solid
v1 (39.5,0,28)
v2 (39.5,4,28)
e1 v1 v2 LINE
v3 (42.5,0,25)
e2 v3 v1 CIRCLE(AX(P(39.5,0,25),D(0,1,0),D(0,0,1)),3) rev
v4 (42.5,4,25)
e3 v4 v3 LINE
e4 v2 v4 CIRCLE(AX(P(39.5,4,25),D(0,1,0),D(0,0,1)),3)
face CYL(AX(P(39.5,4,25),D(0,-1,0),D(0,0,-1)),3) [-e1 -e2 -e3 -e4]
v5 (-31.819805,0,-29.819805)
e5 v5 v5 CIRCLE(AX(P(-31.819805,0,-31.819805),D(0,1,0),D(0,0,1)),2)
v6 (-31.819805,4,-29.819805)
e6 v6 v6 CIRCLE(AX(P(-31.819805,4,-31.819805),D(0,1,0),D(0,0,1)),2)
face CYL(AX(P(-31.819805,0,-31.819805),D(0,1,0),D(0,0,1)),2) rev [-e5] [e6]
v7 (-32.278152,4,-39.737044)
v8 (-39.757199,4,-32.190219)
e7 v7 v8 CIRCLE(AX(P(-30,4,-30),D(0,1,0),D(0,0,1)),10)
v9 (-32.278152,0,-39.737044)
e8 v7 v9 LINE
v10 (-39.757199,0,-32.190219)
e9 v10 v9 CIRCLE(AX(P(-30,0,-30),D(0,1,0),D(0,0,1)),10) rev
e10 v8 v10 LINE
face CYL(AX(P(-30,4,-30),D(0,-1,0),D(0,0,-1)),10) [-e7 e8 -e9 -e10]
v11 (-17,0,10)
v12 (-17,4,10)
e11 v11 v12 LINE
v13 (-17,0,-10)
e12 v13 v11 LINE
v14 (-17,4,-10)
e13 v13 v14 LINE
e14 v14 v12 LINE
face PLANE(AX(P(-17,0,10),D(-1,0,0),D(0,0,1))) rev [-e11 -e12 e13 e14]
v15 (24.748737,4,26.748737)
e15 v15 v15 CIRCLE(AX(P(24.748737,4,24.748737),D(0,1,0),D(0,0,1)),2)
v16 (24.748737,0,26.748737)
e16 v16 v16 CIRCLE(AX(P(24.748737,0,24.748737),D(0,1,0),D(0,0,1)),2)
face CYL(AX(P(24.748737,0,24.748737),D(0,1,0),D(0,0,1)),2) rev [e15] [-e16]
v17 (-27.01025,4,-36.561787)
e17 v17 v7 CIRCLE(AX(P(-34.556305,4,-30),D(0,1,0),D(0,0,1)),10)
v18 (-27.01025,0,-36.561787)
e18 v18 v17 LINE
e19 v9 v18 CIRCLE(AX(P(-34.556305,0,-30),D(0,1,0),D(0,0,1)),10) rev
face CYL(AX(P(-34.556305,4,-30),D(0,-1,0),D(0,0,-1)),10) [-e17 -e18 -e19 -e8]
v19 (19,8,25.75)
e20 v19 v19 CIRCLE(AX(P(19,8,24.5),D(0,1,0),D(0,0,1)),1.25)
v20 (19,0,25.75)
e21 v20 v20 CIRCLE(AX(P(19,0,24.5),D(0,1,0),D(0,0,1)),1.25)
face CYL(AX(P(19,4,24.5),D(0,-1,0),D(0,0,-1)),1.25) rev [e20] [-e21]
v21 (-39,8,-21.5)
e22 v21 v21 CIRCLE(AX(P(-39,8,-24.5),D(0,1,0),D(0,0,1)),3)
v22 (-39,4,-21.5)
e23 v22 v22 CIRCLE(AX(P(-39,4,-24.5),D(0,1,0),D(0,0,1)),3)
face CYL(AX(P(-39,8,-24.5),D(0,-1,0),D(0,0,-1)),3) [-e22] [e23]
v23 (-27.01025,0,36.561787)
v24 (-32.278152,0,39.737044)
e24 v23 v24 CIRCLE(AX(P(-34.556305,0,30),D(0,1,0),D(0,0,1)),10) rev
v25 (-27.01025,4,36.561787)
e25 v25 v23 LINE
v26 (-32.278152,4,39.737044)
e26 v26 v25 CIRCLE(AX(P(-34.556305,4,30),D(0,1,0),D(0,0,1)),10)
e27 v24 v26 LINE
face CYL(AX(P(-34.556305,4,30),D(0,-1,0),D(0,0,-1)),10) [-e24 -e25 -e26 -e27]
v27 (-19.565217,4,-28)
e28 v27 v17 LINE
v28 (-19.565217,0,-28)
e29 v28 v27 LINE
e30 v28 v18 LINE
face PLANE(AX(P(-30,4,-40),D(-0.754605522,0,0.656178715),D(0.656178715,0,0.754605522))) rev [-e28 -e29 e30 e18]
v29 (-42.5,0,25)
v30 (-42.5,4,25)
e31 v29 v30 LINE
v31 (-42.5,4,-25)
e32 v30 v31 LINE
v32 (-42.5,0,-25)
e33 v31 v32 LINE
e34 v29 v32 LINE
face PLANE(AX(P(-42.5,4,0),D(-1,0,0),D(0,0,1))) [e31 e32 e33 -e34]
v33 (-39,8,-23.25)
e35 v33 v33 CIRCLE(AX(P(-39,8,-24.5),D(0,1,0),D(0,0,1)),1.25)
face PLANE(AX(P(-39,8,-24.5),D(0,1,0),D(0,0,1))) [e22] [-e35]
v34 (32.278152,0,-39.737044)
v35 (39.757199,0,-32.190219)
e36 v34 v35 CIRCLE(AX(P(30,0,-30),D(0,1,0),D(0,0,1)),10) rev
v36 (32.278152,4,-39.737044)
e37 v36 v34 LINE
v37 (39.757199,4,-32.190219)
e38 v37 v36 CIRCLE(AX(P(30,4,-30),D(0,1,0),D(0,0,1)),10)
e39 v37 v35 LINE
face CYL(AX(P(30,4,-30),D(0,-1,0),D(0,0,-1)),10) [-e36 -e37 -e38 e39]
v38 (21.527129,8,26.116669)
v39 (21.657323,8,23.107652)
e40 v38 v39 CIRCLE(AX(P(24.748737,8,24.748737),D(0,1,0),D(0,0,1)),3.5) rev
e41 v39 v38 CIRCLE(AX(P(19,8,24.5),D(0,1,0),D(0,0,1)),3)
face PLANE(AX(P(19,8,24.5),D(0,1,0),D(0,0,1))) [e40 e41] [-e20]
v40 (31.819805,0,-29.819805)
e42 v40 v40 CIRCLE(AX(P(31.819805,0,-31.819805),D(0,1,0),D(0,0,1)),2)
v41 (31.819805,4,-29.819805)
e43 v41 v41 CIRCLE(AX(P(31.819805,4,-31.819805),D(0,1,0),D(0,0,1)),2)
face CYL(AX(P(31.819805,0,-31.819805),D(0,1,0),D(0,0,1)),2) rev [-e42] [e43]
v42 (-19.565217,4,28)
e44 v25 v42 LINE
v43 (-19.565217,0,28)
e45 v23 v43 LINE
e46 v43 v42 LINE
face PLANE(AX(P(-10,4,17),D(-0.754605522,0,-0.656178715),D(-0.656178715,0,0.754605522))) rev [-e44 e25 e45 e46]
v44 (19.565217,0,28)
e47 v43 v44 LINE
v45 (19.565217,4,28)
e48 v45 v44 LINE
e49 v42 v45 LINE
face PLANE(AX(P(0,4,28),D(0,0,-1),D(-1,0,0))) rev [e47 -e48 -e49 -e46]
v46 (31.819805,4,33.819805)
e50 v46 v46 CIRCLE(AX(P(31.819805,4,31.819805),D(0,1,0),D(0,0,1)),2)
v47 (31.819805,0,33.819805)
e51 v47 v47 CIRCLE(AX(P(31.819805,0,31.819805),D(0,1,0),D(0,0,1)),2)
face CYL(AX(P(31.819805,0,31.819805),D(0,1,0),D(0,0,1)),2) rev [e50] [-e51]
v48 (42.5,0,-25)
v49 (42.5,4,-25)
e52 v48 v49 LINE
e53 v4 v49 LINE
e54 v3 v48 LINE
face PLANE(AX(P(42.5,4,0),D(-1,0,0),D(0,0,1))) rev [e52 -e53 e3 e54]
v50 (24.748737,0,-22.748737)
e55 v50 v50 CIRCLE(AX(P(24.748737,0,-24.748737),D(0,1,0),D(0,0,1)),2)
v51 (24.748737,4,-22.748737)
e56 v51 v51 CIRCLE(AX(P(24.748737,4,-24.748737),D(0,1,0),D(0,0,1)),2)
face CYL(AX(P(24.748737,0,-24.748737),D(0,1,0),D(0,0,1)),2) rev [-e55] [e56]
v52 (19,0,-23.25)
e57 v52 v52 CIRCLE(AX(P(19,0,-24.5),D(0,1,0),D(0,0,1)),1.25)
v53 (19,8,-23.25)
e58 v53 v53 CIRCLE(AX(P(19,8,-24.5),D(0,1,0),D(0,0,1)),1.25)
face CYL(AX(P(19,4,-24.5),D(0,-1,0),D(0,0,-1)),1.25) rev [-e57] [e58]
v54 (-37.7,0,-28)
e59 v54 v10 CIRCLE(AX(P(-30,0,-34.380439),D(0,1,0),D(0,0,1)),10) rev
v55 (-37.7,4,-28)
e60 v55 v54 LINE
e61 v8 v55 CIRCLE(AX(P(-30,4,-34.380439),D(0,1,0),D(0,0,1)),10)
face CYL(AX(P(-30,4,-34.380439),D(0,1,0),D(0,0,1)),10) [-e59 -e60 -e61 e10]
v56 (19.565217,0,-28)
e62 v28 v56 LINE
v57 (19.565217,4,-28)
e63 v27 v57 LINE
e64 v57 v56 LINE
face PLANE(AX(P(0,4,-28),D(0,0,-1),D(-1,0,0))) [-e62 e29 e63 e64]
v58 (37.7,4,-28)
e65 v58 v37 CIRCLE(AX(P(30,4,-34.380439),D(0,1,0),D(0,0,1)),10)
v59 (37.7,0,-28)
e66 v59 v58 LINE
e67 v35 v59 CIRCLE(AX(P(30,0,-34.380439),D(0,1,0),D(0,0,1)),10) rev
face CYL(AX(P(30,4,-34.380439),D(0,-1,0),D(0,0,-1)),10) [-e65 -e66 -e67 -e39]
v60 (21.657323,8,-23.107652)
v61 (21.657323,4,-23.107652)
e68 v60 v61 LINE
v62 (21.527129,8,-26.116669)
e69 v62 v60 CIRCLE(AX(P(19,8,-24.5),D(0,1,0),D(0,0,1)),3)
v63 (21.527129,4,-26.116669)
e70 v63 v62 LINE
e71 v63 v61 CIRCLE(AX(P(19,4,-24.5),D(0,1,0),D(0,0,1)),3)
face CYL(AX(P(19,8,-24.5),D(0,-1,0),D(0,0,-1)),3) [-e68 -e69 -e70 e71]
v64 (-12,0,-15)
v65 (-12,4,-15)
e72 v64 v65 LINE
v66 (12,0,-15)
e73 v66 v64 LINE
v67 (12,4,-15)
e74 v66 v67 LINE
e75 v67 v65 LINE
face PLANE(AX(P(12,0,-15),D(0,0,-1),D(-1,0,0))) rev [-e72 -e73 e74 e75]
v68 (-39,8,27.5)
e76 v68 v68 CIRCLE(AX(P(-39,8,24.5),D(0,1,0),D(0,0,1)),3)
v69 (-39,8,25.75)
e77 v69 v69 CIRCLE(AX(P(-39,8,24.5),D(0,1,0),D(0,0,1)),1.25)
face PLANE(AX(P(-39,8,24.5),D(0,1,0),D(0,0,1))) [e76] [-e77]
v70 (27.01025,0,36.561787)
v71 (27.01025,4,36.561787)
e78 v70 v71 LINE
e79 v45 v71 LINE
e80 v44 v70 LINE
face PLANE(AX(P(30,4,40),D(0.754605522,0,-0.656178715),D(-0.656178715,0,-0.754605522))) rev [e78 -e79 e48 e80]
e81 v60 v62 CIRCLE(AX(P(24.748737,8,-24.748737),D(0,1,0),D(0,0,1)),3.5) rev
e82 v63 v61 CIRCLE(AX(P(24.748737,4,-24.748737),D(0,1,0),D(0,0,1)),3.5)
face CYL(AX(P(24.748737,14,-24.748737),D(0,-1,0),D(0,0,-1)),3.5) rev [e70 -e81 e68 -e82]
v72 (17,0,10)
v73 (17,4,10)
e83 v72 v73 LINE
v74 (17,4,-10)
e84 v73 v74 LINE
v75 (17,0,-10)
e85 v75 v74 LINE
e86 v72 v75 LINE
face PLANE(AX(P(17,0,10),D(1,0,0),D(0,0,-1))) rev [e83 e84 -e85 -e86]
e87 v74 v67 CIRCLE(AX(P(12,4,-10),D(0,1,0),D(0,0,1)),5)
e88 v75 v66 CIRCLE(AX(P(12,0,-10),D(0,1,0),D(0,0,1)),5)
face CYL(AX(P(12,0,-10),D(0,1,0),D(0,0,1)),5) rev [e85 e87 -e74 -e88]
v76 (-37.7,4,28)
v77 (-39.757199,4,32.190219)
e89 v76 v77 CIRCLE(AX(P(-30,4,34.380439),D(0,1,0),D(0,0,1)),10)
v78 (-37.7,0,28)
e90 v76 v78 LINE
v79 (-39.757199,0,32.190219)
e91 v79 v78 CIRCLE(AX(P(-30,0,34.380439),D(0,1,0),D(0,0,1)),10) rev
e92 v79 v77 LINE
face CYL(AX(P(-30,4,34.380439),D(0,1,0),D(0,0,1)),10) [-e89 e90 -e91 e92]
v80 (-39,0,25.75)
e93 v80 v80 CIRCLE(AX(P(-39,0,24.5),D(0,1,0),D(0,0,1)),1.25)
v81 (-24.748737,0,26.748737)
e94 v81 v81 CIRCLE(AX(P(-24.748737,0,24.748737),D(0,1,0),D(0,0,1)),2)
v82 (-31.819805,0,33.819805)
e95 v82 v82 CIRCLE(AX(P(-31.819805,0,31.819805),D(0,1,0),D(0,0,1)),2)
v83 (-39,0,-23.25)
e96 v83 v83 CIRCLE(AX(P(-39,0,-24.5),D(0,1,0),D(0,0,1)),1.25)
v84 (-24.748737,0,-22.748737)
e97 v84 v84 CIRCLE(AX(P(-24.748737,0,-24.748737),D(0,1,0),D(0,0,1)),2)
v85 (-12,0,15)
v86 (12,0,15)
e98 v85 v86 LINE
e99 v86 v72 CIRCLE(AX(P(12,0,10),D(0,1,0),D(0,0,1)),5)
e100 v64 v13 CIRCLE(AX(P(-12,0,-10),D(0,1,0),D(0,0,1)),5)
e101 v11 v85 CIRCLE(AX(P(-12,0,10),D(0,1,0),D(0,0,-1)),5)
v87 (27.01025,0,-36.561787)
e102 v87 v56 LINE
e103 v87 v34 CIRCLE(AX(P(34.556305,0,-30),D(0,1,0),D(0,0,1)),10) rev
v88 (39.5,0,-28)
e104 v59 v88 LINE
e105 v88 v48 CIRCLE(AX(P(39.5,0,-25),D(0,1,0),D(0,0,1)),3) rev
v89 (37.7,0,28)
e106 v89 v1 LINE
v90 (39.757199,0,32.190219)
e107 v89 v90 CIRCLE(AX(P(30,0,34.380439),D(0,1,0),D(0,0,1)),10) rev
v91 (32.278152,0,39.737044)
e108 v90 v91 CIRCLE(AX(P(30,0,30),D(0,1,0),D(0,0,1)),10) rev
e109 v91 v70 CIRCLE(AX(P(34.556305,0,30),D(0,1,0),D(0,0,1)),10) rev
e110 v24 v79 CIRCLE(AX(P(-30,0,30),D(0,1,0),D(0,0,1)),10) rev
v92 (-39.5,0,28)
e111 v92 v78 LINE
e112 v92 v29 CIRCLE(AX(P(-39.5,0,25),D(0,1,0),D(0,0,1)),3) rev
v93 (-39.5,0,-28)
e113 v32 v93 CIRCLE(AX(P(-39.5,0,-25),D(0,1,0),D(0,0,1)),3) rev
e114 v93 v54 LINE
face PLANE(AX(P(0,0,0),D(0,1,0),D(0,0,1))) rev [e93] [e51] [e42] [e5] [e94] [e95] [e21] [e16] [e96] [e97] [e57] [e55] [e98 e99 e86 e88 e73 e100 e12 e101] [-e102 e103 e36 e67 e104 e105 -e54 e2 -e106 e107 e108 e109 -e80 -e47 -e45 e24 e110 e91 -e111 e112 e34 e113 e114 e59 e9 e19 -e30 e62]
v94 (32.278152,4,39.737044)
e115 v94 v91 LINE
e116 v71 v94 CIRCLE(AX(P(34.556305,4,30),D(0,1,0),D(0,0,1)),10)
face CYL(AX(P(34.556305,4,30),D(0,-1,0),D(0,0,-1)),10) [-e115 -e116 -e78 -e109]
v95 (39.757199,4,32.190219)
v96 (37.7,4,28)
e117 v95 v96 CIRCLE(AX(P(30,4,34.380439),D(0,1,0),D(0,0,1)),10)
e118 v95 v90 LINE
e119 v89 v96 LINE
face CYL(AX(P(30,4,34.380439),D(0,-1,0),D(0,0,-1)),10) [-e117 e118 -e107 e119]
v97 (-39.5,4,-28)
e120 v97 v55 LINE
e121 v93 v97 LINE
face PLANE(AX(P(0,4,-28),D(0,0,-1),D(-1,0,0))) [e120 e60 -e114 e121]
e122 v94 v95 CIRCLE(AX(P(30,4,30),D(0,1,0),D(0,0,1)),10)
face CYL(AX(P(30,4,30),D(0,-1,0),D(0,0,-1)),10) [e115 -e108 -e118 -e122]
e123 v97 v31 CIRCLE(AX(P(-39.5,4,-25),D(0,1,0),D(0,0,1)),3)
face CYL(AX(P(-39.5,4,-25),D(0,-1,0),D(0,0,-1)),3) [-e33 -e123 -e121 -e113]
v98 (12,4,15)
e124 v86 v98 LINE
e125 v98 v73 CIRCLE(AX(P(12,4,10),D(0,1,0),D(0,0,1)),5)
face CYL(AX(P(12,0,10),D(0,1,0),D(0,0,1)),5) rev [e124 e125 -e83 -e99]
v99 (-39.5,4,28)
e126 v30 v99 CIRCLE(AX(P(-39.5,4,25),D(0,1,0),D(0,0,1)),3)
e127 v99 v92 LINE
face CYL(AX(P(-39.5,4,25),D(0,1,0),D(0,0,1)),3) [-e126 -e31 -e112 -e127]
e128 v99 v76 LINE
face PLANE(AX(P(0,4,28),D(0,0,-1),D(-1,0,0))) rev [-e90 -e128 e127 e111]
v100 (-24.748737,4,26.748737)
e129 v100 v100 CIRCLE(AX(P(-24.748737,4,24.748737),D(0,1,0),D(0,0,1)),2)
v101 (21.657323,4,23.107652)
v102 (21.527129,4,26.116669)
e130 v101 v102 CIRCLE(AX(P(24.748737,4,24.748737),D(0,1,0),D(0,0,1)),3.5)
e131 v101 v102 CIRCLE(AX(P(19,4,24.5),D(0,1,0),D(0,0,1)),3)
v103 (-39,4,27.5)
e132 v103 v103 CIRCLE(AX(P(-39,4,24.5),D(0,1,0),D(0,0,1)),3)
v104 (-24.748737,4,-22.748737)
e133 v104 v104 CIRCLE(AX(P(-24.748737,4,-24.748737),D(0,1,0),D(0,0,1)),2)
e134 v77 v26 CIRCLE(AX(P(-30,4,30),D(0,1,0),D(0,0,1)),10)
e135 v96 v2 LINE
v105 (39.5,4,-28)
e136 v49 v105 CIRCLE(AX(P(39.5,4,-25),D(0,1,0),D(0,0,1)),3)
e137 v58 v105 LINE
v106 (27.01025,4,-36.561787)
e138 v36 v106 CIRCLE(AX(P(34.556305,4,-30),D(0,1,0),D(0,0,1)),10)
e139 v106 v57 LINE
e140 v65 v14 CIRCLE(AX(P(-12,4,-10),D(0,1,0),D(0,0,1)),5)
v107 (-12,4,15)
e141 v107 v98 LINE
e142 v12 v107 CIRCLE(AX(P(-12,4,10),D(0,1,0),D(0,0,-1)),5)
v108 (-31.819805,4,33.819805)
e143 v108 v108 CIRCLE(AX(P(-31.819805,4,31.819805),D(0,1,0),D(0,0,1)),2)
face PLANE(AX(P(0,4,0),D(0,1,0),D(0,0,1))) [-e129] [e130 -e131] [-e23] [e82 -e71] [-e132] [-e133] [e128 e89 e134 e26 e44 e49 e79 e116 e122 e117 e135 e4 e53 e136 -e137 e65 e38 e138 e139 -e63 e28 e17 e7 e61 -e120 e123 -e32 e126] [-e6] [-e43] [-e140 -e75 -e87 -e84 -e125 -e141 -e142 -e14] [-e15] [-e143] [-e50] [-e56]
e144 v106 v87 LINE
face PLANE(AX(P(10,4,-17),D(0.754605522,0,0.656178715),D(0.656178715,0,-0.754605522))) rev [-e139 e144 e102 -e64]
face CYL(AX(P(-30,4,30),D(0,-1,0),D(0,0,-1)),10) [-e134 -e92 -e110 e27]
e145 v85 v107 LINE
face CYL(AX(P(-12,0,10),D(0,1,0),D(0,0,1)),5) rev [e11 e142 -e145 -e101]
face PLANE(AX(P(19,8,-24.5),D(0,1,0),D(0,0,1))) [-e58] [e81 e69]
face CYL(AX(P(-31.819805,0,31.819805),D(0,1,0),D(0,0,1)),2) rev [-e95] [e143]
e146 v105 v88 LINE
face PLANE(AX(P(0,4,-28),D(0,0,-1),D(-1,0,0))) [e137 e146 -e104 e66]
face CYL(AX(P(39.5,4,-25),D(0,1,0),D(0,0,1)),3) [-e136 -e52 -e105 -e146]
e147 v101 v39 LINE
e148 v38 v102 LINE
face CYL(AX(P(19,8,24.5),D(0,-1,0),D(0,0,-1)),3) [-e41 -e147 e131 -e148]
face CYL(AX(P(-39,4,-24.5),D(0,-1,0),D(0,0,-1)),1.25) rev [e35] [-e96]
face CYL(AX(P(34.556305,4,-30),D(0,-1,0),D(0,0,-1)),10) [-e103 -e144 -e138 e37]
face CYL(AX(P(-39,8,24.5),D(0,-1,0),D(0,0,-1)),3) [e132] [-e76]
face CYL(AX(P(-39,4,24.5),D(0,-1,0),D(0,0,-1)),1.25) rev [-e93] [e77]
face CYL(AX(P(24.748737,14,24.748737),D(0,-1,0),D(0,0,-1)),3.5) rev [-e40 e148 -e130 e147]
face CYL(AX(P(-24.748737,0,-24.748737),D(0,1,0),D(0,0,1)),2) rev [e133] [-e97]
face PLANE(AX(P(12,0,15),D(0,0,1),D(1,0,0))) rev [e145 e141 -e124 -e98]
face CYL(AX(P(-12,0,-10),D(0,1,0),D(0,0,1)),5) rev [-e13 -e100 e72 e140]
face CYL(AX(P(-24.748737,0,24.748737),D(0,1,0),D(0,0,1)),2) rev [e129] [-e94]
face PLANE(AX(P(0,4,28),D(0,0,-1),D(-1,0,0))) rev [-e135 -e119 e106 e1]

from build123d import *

# Parameters (mm, degrees)
SKETCH1_W           = 85
SKETCH1_H           = 56
SKETCH1_R           = 1.25
BOSS_EXTRUDE1_DEPTH = 4
SKETCH2_R           = 3
SKETCH2_R_2         = 1.25
BOSS_EXTRUDE2_DEPTH = 4
FILLET1_R           = 3
BOSS_EXTRUDE4_DEPTH = 4
SKETCH3_R           = 2
CUT_EXTRUDE1_DEPTH  = 59.5
FILLET2_R           = 10
CUT_EXTRUDE2_START  = -10
SKETCH6_R           = 1.25
CUT_EXTRUDE2_DEPTH  = 10
SKETCH7_R           = 3.5
CUT_EXTRUDE3_DEPTH  = 10


with BuildPart() as part:
    # Sketch1 → Boss-Extrude1 (new body)
    with BuildSketch(Plane(origin=(0, 0, 0), x_dir=(1, 0, 0), z_dir=(0, 1, 0))):
        Rectangle(SKETCH1_W, SKETCH1_H)
        with Locations(Location((-39, 24.5, 0), (0, 0, 270))):
            Circle(SKETCH1_R, mode=Mode.SUBTRACT)
        with Locations(Location((-39, -24.5, 0), (0, 0, 270))):
            Circle(SKETCH1_R, mode=Mode.SUBTRACT)
        with Locations(Location((19, 24.5, 0), (0, 0, 270))):
            Circle(SKETCH1_R, mode=Mode.SUBTRACT)
        with Locations(Location((19, -24.5, 0), (0, 0, 270))):
            Circle(SKETCH1_R, mode=Mode.SUBTRACT)
        with BuildLine():
            Line((-12, -15), (12, -15))
            ThreePointArc((12, -15), (15.535533906, -13.535533906), (17, -10))
            Line((17, -10), (17, 10))
            ThreePointArc((17, 10), (15.535533906, 13.535533906), (12, 15))
            Line((12, 15), (-12, 15))
            ThreePointArc((-12, 15), (-15.535533906, 13.535533906), (-17, 10))
            Line((-17, 10), (-17, -10))
            ThreePointArc((-17, -10), (-15.535533906, -13.535533906), (-12, -15))
        make_face(mode=Mode.SUBTRACT)
    extrude(amount=BOSS_EXTRUDE1_DEPTH)

    # Sketch2 → Boss-Extrude2 (add)
    # profile 1 of 4: a face of its own
    with BuildSketch(Plane(origin=(0, 4, 0), x_dir=(1, 0, 0), z_dir=(0, 1, 0))):
        with Locations(Location((-39, 24.5, 0), (0, 0, 270))):
            Circle(SKETCH2_R)
        with Locations(Location((-39, 24.5, 0), (0, 0, 270))):
            Circle(SKETCH2_R_2, mode=Mode.SUBTRACT)
    # profile 2 of 4: a face of its own
    with BuildSketch(Plane(origin=(0, 4, 0), x_dir=(1, 0, 0), z_dir=(0, 1, 0))):
        with Locations(Location((19, 24.5, 0), (0, 0, 270))):
            Circle(SKETCH2_R)
        with Locations(Location((19, 24.5, 0), (0, 0, 270))):
            Circle(SKETCH2_R_2, mode=Mode.SUBTRACT)
    # profile 3 of 4: a face of its own
    with BuildSketch(Plane(origin=(0, 4, 0), x_dir=(1, 0, 0), z_dir=(0, 1, 0))):
        with Locations(Location((19, -24.5, 0), (0, 0, 270))):
            Circle(SKETCH2_R)
        with Locations(Location((19, -24.5, 0), (0, 0, 270))):
            Circle(SKETCH2_R_2, mode=Mode.SUBTRACT)
    # profile 4 of 4: a face of its own
    with BuildSketch(Plane(origin=(0, 4, 0), x_dir=(1, 0, 0), z_dir=(0, 1, 0))):
        with Locations(Location((-39, -24.5, 0), (0, 0, 270))):
            Circle(SKETCH2_R)
        with Locations(Location((-39, -24.5, 0), (0, 0, 270))):
            Circle(SKETCH2_R_2, mode=Mode.SUBTRACT)
    extrude(amount=BOSS_EXTRUDE2_DEPTH)

    # Fillet1
    fillet1_edges = [part.edges().sort_by_distance(p)[0] for p in [
        (-42.5, 2, 28),
        (-42.5, 2, -28),
        (42.5, 2, -28),
        (42.5, 2, 28),
    ]]
    fillet(fillet1_edges, radius=FILLET1_R)

    # Sketch5 → Boss-Extrude4 (add)
    with BuildSketch(Plane(origin=(0, 0, 0), x_dir=(1, 0, 0), z_dir=(0, 1, 0))):
        Polygon((-40, -30), (-17, -10), (-17, 10), (-40, 30), (-40, 40), (-30, 40), (-10, 17), (10, 17), (30, 40), (40, 40), (40, 30), (17, 10), (17, -10), (40, -30), (40, -40), (30, -40), (10, -17), (-10, -17), (-30, -40), (-40, -40), align=None)
    extrude(amount=BOSS_EXTRUDE4_DEPTH)

    # Sketch3 → Cut-Extrude1 (cut, through all)
    with BuildSketch(Plane(origin=(0, 4, 0), x_dir=(1, 0, 0), z_dir=(0, 1, 0))):
        with Locations(Location((-31.819805153, 31.819805153, 0), (0, 0, 270))):
            Circle(SKETCH3_R)
        with Locations(Location((-24.748737342, 24.748737342, 0), (0, 0, 270))):
            Circle(SKETCH3_R)
        with Locations(Location((31.819805153, 31.819805153, 0), (0, 0, 270))):
            Circle(SKETCH3_R)
        with Locations(Location((24.748737342, 24.748737342, 0), (0, 0, 270))):
            Circle(SKETCH3_R)
        with Locations(Location((24.748737342, -24.748737342, 0), (0, 0, 270))):
            Circle(SKETCH3_R)
        with Locations(Location((31.819805153, -31.819805153, 0), (0, 0, 270))):
            Circle(SKETCH3_R)
        with Locations(Location((-31.819805153, -31.819805153, 0), (0, 0, 270))):
            Circle(SKETCH3_R)
        with Locations(Location((-24.748737342, -24.748737342, 0), (0, 0, 270))):
            Circle(SKETCH3_R)
        with BuildLine():
            Line((12, -15), (-12, -15))
            ThreePointArc((-12, -15), (-15.535533906, -13.535533906), (-17, -10))
            Line((-17, -10), (-17, 10))
            ThreePointArc((-17, 10), (-15.535533906, 13.535533906), (-12, 15))
            Line((-12, 15), (12, 15))
            ThreePointArc((12, 15), (15.535533906, 13.535533906), (17, 10))
            Line((17, 10), (17, -10))
            ThreePointArc((17, -10), (15.535533906, -13.535533906), (12, -15))
        make_face()
    extrude(amount=-CUT_EXTRUDE1_DEPTH, mode=Mode.SUBTRACT)

    # Fillet2
    # the kernel refuses this fillet: 10 mm, written as the material it takes off along each edge
    with BuildSketch(Plane(origin=(-40, -10.951097141, -30), x_dir=(0.7546055221635131, 0, 0.6561787149247771), z_dir=(0, 1, 0))) as fillet2_piece_1_section:
        with BuildLine():
            CenterArc((4.671704482, 9.8672905), FILLET2_R, 221.009086902, 39.646111147)
            Line((-2.87435074, 3.305503351), (-3.025271844, 3.174267608))
            Line((-3.025271844, 3.174267608), (-0.150921104, -0.131235743))
            Line((-0.150921104, -0.131235743), (0, -0.2))
            ThreePointArc((0, -0.2), (1.523975065, -0.2), (3.015475044, -0.19734581))
            Line((3.015475044, -0.19734581), (3.047950131, 0))
        make_face()
    fillet2_piece_1 = extrude(amount=25.902194282, mode=Mode.PRIVATE)
    fillet2_piece_1 = split(fillet2_piece_1, bisect_by=Plane(origin=(-39.506364614, 2, -28), z_dir=(0, 0, -1)), keep=Keep.TOP, mode=Mode.PRIVATE)
    add(fillet2_piece_1, mode=Mode.SUBTRACT)
    with BuildSketch(Plane(origin=(-40, -25, -40), x_dir=(0, 0, 1), z_dir=(0, 1, 0)), Plane(origin=(40, -25, -40), x_dir=(-1, 0, 0), z_dir=(0, 1, 0))) as fillet2_piece_2:
        with BuildLine():
            CenterArc((FILLET2_R, FILLET2_R), FILLET2_R, 180, 90)
            Line((0, FILLET2_R), (-FILLET2_R * 0.02, FILLET2_R))
            Line((-FILLET2_R * 0.02, FILLET2_R), (-FILLET2_R * 0.02, -FILLET2_R * 0.02))
            Line((-FILLET2_R * 0.02, -FILLET2_R * 0.02), (FILLET2_R, -FILLET2_R * 0.02))
            Line((FILLET2_R, -FILLET2_R * 0.02), (FILLET2_R, 0))
        make_face()
    extrude(amount=54, mode=Mode.SUBTRACT)
    with BuildSketch(Plane(origin=(-30, -11.390762292, -40), x_dir=(-1, 0, 0), z_dir=(0, 1, 0)), Plane(origin=(30, -11.390762292, -40), x_dir=(-0.6561787149247741, 0, 0.7546055221635154), z_dir=(0, 1, 0))) as fillet2_piece_3:
        with BuildLine():
            CenterArc((FILLET2_R * 0.455630491663, FILLET2_R), FILLET2_R, 221.009086902, 48.990913098)
            Line((-FILLET2_R * 0.2989750305, FILLET2_R * 0.343821285075), (-FILLET2_R * 0.314067140943, FILLET2_R * 0.330697710777))
            Line((-FILLET2_R * 0.314067140943, FILLET2_R * 0.330697710777), (-FILLET2_R * 0.00911260983327, -FILLET2_R * 0.02))
            Line((-FILLET2_R * 0.00911260983327, -FILLET2_R * 0.02), (FILLET2_R * 0.455630491663, -FILLET2_R * 0.02))
            Line((FILLET2_R * 0.455630491663, -FILLET2_R * 0.02), (FILLET2_R * 0.455630491663, 0))
        make_face()
    extrude(amount=26.781524583, mode=Mode.SUBTRACT)
    with BuildSketch(Plane(origin=(40, -10.951097141, -30), x_dir=(0, 0, -1), z_dir=(0, 1, 0))) as fillet2_piece_4_section:
        with BuildLine():
            CenterArc((4.380438856, 10), FILLET2_R, 230.353888853, 39.646111147)
            Line((-2, 2.3), (-2.127608777, 2.146))
            ThreePointArc((-2.127608777, 2.146), (-1.150921104, 1.018764257), (-0.150921104, -0.131235743))
            Line((-0.150921104, -0.131235743), (0, -0.2))
            Line((0, -0.2), (4.380438856, -0.2))
            Line((4.380438856, -0.2), (4.380438856, 0))
        make_face()
    fillet2_piece_4 = extrude(amount=25.902194282, mode=Mode.PRIVATE)
    fillet2_piece_4 = split(fillet2_piece_4, bisect_by=Plane(origin=(39.506364614, 2, -28), z_dir=(0, 0, -1)), keep=Keep.TOP, mode=Mode.PRIVATE)
    add(fillet2_piece_4, mode=Mode.SUBTRACT)
    with BuildSketch(Plane(origin=(40, -10.951097141, 30), x_dir=(0, 0, 1), z_dir=(0, 1, 0))) as fillet2_piece_5_section:
        with BuildLine():
            CenterArc((4.380438856, -10), FILLET2_R, 90, 39.646111147)
            Line((-2, -2.3), (-2.127608777, -2.146))
            ThreePointArc((-2.127608777, -2.146), (-1.150921104, -1.018764257), (-0.150921104, 0.131235743))
            Line((-0.150921104, 0.131235743), (0, 0.2))
            Line((0, 0.2), (4.380438856, 0.2))
            Line((4.380438856, 0.2), (4.380438856, 0))
        make_face()
    fillet2_piece_5 = extrude(amount=25.902194282, mode=Mode.PRIVATE)
    fillet2_piece_5 = split(fillet2_piece_5, bisect_by=Plane(origin=(39.506364614, 2, 28), z_dir=(0, 0, 1)), keep=Keep.TOP, mode=Mode.PRIVATE)
    add(fillet2_piece_5, mode=Mode.SUBTRACT)
    with BuildSketch(Plane(origin=(40, -25, 40), x_dir=(-1, 0, 0), z_dir=(0, 1, 0)), Plane(origin=(-40, -25, 40), x_dir=(0, 0, -1), z_dir=(0, 1, 0))) as fillet2_piece_6:
        with BuildLine():
            CenterArc((FILLET2_R, -FILLET2_R), FILLET2_R, 90, 90)
            Line((0, -FILLET2_R), (-FILLET2_R * 0.02, -FILLET2_R))
            Line((-FILLET2_R * 0.02, -FILLET2_R), (-FILLET2_R * 0.02, FILLET2_R * 0.02))
            Line((-FILLET2_R * 0.02, FILLET2_R * 0.02), (FILLET2_R, FILLET2_R * 0.02))
            Line((FILLET2_R, FILLET2_R * 0.02), (FILLET2_R, 0))
        make_face()
    extrude(amount=54, mode=Mode.SUBTRACT)
    with BuildSketch(Plane(origin=(30, -11.390762292, 40), x_dir=(-0.6561787149247873, 0, -0.7546055221635042), z_dir=(0, 1, 0)), Plane(origin=(-30, -11.390762292, 40), x_dir=(-1, 0, 0), z_dir=(0, 1, 0))) as fillet2_piece_7:
        with BuildLine():
            CenterArc((FILLET2_R * 0.455630491663, -FILLET2_R), FILLET2_R, 90, 48.990913098)
            Line((-FILLET2_R * 0.2989750305, -FILLET2_R * 0.343821285075), (-FILLET2_R * 0.314067140943, -FILLET2_R * 0.330697710777))
            Line((-FILLET2_R * 0.314067140943, -FILLET2_R * 0.330697710777), (-FILLET2_R * 0.00911260983327, FILLET2_R * 0.02))
            Line((-FILLET2_R * 0.00911260983327, FILLET2_R * 0.02), (FILLET2_R * 0.455630491663, FILLET2_R * 0.02))
            Line((FILLET2_R * 0.455630491663, FILLET2_R * 0.02), (FILLET2_R * 0.455630491663, 0))
        make_face()
    extrude(amount=26.781524583, mode=Mode.SUBTRACT)
    with BuildSketch(Plane(origin=(-40, -10.951097141, 30), x_dir=(0.7546055221635047, 0, -0.6561787149247865), z_dir=(0, 1, 0))) as fillet2_piece_8_section:
        with BuildLine():
            CenterArc((4.671704482, -9.8672905), FILLET2_R, 99.344801951, 39.646111147)
            Line((-2.87435074, -3.305503351), (-3.025271844, -3.174267608))
            Line((-3.025271844, -3.174267608), (-0.150921104, 0.131235743))
            Line((-0.150921104, 0.131235743), (0, 0.2))
            ThreePointArc((0, 0.2), (1.523975065, 0.2), (3.015475044, 0.19734581))
            Line((3.015475044, 0.19734581), (3.047950131, 0))
        make_face()
    fillet2_piece_8 = extrude(amount=25.902194282, mode=Mode.PRIVATE)
    fillet2_piece_8 = split(fillet2_piece_8, bisect_by=Plane(origin=(-39.506364614, 2, 28), z_dir=(0, 0, 1)), keep=Keep.TOP, mode=Mode.PRIVATE)
    add(fillet2_piece_8, mode=Mode.SUBTRACT)

    # Sketch6 → Cut-Extrude2 (cut)
    with BuildSketch(Plane(origin=(0, 4, 0), x_dir=(1, 0, 0), z_dir=(0, 1, 0)).offset(CUT_EXTRUDE2_START)):
        with Locations(Location((19, -24.5, 0), (0, 0, 270))):
            Circle(SKETCH6_R)
        with Locations(Location((19, 24.5, 0), (0, 0, 270))):
            Circle(SKETCH6_R)
    extrude(amount=CUT_EXTRUDE2_DEPTH, mode=Mode.SUBTRACT)

    # Sketch7 → Cut-Extrude3 (cut)
    with BuildSketch(Plane(origin=(0, 4, 0), x_dir=(1, 0, 0), z_dir=(0, 1, 0))):
        with Locations((24.748737342, -24.748737342)):
            Circle(SKETCH7_R)
        with Locations((24.748737342, 24.748737342)):
            Circle(SKETCH7_R)
    extrude(amount=CUT_EXTRUDE3_DEPTH, mode=Mode.SUBTRACT)


solid = part.part
